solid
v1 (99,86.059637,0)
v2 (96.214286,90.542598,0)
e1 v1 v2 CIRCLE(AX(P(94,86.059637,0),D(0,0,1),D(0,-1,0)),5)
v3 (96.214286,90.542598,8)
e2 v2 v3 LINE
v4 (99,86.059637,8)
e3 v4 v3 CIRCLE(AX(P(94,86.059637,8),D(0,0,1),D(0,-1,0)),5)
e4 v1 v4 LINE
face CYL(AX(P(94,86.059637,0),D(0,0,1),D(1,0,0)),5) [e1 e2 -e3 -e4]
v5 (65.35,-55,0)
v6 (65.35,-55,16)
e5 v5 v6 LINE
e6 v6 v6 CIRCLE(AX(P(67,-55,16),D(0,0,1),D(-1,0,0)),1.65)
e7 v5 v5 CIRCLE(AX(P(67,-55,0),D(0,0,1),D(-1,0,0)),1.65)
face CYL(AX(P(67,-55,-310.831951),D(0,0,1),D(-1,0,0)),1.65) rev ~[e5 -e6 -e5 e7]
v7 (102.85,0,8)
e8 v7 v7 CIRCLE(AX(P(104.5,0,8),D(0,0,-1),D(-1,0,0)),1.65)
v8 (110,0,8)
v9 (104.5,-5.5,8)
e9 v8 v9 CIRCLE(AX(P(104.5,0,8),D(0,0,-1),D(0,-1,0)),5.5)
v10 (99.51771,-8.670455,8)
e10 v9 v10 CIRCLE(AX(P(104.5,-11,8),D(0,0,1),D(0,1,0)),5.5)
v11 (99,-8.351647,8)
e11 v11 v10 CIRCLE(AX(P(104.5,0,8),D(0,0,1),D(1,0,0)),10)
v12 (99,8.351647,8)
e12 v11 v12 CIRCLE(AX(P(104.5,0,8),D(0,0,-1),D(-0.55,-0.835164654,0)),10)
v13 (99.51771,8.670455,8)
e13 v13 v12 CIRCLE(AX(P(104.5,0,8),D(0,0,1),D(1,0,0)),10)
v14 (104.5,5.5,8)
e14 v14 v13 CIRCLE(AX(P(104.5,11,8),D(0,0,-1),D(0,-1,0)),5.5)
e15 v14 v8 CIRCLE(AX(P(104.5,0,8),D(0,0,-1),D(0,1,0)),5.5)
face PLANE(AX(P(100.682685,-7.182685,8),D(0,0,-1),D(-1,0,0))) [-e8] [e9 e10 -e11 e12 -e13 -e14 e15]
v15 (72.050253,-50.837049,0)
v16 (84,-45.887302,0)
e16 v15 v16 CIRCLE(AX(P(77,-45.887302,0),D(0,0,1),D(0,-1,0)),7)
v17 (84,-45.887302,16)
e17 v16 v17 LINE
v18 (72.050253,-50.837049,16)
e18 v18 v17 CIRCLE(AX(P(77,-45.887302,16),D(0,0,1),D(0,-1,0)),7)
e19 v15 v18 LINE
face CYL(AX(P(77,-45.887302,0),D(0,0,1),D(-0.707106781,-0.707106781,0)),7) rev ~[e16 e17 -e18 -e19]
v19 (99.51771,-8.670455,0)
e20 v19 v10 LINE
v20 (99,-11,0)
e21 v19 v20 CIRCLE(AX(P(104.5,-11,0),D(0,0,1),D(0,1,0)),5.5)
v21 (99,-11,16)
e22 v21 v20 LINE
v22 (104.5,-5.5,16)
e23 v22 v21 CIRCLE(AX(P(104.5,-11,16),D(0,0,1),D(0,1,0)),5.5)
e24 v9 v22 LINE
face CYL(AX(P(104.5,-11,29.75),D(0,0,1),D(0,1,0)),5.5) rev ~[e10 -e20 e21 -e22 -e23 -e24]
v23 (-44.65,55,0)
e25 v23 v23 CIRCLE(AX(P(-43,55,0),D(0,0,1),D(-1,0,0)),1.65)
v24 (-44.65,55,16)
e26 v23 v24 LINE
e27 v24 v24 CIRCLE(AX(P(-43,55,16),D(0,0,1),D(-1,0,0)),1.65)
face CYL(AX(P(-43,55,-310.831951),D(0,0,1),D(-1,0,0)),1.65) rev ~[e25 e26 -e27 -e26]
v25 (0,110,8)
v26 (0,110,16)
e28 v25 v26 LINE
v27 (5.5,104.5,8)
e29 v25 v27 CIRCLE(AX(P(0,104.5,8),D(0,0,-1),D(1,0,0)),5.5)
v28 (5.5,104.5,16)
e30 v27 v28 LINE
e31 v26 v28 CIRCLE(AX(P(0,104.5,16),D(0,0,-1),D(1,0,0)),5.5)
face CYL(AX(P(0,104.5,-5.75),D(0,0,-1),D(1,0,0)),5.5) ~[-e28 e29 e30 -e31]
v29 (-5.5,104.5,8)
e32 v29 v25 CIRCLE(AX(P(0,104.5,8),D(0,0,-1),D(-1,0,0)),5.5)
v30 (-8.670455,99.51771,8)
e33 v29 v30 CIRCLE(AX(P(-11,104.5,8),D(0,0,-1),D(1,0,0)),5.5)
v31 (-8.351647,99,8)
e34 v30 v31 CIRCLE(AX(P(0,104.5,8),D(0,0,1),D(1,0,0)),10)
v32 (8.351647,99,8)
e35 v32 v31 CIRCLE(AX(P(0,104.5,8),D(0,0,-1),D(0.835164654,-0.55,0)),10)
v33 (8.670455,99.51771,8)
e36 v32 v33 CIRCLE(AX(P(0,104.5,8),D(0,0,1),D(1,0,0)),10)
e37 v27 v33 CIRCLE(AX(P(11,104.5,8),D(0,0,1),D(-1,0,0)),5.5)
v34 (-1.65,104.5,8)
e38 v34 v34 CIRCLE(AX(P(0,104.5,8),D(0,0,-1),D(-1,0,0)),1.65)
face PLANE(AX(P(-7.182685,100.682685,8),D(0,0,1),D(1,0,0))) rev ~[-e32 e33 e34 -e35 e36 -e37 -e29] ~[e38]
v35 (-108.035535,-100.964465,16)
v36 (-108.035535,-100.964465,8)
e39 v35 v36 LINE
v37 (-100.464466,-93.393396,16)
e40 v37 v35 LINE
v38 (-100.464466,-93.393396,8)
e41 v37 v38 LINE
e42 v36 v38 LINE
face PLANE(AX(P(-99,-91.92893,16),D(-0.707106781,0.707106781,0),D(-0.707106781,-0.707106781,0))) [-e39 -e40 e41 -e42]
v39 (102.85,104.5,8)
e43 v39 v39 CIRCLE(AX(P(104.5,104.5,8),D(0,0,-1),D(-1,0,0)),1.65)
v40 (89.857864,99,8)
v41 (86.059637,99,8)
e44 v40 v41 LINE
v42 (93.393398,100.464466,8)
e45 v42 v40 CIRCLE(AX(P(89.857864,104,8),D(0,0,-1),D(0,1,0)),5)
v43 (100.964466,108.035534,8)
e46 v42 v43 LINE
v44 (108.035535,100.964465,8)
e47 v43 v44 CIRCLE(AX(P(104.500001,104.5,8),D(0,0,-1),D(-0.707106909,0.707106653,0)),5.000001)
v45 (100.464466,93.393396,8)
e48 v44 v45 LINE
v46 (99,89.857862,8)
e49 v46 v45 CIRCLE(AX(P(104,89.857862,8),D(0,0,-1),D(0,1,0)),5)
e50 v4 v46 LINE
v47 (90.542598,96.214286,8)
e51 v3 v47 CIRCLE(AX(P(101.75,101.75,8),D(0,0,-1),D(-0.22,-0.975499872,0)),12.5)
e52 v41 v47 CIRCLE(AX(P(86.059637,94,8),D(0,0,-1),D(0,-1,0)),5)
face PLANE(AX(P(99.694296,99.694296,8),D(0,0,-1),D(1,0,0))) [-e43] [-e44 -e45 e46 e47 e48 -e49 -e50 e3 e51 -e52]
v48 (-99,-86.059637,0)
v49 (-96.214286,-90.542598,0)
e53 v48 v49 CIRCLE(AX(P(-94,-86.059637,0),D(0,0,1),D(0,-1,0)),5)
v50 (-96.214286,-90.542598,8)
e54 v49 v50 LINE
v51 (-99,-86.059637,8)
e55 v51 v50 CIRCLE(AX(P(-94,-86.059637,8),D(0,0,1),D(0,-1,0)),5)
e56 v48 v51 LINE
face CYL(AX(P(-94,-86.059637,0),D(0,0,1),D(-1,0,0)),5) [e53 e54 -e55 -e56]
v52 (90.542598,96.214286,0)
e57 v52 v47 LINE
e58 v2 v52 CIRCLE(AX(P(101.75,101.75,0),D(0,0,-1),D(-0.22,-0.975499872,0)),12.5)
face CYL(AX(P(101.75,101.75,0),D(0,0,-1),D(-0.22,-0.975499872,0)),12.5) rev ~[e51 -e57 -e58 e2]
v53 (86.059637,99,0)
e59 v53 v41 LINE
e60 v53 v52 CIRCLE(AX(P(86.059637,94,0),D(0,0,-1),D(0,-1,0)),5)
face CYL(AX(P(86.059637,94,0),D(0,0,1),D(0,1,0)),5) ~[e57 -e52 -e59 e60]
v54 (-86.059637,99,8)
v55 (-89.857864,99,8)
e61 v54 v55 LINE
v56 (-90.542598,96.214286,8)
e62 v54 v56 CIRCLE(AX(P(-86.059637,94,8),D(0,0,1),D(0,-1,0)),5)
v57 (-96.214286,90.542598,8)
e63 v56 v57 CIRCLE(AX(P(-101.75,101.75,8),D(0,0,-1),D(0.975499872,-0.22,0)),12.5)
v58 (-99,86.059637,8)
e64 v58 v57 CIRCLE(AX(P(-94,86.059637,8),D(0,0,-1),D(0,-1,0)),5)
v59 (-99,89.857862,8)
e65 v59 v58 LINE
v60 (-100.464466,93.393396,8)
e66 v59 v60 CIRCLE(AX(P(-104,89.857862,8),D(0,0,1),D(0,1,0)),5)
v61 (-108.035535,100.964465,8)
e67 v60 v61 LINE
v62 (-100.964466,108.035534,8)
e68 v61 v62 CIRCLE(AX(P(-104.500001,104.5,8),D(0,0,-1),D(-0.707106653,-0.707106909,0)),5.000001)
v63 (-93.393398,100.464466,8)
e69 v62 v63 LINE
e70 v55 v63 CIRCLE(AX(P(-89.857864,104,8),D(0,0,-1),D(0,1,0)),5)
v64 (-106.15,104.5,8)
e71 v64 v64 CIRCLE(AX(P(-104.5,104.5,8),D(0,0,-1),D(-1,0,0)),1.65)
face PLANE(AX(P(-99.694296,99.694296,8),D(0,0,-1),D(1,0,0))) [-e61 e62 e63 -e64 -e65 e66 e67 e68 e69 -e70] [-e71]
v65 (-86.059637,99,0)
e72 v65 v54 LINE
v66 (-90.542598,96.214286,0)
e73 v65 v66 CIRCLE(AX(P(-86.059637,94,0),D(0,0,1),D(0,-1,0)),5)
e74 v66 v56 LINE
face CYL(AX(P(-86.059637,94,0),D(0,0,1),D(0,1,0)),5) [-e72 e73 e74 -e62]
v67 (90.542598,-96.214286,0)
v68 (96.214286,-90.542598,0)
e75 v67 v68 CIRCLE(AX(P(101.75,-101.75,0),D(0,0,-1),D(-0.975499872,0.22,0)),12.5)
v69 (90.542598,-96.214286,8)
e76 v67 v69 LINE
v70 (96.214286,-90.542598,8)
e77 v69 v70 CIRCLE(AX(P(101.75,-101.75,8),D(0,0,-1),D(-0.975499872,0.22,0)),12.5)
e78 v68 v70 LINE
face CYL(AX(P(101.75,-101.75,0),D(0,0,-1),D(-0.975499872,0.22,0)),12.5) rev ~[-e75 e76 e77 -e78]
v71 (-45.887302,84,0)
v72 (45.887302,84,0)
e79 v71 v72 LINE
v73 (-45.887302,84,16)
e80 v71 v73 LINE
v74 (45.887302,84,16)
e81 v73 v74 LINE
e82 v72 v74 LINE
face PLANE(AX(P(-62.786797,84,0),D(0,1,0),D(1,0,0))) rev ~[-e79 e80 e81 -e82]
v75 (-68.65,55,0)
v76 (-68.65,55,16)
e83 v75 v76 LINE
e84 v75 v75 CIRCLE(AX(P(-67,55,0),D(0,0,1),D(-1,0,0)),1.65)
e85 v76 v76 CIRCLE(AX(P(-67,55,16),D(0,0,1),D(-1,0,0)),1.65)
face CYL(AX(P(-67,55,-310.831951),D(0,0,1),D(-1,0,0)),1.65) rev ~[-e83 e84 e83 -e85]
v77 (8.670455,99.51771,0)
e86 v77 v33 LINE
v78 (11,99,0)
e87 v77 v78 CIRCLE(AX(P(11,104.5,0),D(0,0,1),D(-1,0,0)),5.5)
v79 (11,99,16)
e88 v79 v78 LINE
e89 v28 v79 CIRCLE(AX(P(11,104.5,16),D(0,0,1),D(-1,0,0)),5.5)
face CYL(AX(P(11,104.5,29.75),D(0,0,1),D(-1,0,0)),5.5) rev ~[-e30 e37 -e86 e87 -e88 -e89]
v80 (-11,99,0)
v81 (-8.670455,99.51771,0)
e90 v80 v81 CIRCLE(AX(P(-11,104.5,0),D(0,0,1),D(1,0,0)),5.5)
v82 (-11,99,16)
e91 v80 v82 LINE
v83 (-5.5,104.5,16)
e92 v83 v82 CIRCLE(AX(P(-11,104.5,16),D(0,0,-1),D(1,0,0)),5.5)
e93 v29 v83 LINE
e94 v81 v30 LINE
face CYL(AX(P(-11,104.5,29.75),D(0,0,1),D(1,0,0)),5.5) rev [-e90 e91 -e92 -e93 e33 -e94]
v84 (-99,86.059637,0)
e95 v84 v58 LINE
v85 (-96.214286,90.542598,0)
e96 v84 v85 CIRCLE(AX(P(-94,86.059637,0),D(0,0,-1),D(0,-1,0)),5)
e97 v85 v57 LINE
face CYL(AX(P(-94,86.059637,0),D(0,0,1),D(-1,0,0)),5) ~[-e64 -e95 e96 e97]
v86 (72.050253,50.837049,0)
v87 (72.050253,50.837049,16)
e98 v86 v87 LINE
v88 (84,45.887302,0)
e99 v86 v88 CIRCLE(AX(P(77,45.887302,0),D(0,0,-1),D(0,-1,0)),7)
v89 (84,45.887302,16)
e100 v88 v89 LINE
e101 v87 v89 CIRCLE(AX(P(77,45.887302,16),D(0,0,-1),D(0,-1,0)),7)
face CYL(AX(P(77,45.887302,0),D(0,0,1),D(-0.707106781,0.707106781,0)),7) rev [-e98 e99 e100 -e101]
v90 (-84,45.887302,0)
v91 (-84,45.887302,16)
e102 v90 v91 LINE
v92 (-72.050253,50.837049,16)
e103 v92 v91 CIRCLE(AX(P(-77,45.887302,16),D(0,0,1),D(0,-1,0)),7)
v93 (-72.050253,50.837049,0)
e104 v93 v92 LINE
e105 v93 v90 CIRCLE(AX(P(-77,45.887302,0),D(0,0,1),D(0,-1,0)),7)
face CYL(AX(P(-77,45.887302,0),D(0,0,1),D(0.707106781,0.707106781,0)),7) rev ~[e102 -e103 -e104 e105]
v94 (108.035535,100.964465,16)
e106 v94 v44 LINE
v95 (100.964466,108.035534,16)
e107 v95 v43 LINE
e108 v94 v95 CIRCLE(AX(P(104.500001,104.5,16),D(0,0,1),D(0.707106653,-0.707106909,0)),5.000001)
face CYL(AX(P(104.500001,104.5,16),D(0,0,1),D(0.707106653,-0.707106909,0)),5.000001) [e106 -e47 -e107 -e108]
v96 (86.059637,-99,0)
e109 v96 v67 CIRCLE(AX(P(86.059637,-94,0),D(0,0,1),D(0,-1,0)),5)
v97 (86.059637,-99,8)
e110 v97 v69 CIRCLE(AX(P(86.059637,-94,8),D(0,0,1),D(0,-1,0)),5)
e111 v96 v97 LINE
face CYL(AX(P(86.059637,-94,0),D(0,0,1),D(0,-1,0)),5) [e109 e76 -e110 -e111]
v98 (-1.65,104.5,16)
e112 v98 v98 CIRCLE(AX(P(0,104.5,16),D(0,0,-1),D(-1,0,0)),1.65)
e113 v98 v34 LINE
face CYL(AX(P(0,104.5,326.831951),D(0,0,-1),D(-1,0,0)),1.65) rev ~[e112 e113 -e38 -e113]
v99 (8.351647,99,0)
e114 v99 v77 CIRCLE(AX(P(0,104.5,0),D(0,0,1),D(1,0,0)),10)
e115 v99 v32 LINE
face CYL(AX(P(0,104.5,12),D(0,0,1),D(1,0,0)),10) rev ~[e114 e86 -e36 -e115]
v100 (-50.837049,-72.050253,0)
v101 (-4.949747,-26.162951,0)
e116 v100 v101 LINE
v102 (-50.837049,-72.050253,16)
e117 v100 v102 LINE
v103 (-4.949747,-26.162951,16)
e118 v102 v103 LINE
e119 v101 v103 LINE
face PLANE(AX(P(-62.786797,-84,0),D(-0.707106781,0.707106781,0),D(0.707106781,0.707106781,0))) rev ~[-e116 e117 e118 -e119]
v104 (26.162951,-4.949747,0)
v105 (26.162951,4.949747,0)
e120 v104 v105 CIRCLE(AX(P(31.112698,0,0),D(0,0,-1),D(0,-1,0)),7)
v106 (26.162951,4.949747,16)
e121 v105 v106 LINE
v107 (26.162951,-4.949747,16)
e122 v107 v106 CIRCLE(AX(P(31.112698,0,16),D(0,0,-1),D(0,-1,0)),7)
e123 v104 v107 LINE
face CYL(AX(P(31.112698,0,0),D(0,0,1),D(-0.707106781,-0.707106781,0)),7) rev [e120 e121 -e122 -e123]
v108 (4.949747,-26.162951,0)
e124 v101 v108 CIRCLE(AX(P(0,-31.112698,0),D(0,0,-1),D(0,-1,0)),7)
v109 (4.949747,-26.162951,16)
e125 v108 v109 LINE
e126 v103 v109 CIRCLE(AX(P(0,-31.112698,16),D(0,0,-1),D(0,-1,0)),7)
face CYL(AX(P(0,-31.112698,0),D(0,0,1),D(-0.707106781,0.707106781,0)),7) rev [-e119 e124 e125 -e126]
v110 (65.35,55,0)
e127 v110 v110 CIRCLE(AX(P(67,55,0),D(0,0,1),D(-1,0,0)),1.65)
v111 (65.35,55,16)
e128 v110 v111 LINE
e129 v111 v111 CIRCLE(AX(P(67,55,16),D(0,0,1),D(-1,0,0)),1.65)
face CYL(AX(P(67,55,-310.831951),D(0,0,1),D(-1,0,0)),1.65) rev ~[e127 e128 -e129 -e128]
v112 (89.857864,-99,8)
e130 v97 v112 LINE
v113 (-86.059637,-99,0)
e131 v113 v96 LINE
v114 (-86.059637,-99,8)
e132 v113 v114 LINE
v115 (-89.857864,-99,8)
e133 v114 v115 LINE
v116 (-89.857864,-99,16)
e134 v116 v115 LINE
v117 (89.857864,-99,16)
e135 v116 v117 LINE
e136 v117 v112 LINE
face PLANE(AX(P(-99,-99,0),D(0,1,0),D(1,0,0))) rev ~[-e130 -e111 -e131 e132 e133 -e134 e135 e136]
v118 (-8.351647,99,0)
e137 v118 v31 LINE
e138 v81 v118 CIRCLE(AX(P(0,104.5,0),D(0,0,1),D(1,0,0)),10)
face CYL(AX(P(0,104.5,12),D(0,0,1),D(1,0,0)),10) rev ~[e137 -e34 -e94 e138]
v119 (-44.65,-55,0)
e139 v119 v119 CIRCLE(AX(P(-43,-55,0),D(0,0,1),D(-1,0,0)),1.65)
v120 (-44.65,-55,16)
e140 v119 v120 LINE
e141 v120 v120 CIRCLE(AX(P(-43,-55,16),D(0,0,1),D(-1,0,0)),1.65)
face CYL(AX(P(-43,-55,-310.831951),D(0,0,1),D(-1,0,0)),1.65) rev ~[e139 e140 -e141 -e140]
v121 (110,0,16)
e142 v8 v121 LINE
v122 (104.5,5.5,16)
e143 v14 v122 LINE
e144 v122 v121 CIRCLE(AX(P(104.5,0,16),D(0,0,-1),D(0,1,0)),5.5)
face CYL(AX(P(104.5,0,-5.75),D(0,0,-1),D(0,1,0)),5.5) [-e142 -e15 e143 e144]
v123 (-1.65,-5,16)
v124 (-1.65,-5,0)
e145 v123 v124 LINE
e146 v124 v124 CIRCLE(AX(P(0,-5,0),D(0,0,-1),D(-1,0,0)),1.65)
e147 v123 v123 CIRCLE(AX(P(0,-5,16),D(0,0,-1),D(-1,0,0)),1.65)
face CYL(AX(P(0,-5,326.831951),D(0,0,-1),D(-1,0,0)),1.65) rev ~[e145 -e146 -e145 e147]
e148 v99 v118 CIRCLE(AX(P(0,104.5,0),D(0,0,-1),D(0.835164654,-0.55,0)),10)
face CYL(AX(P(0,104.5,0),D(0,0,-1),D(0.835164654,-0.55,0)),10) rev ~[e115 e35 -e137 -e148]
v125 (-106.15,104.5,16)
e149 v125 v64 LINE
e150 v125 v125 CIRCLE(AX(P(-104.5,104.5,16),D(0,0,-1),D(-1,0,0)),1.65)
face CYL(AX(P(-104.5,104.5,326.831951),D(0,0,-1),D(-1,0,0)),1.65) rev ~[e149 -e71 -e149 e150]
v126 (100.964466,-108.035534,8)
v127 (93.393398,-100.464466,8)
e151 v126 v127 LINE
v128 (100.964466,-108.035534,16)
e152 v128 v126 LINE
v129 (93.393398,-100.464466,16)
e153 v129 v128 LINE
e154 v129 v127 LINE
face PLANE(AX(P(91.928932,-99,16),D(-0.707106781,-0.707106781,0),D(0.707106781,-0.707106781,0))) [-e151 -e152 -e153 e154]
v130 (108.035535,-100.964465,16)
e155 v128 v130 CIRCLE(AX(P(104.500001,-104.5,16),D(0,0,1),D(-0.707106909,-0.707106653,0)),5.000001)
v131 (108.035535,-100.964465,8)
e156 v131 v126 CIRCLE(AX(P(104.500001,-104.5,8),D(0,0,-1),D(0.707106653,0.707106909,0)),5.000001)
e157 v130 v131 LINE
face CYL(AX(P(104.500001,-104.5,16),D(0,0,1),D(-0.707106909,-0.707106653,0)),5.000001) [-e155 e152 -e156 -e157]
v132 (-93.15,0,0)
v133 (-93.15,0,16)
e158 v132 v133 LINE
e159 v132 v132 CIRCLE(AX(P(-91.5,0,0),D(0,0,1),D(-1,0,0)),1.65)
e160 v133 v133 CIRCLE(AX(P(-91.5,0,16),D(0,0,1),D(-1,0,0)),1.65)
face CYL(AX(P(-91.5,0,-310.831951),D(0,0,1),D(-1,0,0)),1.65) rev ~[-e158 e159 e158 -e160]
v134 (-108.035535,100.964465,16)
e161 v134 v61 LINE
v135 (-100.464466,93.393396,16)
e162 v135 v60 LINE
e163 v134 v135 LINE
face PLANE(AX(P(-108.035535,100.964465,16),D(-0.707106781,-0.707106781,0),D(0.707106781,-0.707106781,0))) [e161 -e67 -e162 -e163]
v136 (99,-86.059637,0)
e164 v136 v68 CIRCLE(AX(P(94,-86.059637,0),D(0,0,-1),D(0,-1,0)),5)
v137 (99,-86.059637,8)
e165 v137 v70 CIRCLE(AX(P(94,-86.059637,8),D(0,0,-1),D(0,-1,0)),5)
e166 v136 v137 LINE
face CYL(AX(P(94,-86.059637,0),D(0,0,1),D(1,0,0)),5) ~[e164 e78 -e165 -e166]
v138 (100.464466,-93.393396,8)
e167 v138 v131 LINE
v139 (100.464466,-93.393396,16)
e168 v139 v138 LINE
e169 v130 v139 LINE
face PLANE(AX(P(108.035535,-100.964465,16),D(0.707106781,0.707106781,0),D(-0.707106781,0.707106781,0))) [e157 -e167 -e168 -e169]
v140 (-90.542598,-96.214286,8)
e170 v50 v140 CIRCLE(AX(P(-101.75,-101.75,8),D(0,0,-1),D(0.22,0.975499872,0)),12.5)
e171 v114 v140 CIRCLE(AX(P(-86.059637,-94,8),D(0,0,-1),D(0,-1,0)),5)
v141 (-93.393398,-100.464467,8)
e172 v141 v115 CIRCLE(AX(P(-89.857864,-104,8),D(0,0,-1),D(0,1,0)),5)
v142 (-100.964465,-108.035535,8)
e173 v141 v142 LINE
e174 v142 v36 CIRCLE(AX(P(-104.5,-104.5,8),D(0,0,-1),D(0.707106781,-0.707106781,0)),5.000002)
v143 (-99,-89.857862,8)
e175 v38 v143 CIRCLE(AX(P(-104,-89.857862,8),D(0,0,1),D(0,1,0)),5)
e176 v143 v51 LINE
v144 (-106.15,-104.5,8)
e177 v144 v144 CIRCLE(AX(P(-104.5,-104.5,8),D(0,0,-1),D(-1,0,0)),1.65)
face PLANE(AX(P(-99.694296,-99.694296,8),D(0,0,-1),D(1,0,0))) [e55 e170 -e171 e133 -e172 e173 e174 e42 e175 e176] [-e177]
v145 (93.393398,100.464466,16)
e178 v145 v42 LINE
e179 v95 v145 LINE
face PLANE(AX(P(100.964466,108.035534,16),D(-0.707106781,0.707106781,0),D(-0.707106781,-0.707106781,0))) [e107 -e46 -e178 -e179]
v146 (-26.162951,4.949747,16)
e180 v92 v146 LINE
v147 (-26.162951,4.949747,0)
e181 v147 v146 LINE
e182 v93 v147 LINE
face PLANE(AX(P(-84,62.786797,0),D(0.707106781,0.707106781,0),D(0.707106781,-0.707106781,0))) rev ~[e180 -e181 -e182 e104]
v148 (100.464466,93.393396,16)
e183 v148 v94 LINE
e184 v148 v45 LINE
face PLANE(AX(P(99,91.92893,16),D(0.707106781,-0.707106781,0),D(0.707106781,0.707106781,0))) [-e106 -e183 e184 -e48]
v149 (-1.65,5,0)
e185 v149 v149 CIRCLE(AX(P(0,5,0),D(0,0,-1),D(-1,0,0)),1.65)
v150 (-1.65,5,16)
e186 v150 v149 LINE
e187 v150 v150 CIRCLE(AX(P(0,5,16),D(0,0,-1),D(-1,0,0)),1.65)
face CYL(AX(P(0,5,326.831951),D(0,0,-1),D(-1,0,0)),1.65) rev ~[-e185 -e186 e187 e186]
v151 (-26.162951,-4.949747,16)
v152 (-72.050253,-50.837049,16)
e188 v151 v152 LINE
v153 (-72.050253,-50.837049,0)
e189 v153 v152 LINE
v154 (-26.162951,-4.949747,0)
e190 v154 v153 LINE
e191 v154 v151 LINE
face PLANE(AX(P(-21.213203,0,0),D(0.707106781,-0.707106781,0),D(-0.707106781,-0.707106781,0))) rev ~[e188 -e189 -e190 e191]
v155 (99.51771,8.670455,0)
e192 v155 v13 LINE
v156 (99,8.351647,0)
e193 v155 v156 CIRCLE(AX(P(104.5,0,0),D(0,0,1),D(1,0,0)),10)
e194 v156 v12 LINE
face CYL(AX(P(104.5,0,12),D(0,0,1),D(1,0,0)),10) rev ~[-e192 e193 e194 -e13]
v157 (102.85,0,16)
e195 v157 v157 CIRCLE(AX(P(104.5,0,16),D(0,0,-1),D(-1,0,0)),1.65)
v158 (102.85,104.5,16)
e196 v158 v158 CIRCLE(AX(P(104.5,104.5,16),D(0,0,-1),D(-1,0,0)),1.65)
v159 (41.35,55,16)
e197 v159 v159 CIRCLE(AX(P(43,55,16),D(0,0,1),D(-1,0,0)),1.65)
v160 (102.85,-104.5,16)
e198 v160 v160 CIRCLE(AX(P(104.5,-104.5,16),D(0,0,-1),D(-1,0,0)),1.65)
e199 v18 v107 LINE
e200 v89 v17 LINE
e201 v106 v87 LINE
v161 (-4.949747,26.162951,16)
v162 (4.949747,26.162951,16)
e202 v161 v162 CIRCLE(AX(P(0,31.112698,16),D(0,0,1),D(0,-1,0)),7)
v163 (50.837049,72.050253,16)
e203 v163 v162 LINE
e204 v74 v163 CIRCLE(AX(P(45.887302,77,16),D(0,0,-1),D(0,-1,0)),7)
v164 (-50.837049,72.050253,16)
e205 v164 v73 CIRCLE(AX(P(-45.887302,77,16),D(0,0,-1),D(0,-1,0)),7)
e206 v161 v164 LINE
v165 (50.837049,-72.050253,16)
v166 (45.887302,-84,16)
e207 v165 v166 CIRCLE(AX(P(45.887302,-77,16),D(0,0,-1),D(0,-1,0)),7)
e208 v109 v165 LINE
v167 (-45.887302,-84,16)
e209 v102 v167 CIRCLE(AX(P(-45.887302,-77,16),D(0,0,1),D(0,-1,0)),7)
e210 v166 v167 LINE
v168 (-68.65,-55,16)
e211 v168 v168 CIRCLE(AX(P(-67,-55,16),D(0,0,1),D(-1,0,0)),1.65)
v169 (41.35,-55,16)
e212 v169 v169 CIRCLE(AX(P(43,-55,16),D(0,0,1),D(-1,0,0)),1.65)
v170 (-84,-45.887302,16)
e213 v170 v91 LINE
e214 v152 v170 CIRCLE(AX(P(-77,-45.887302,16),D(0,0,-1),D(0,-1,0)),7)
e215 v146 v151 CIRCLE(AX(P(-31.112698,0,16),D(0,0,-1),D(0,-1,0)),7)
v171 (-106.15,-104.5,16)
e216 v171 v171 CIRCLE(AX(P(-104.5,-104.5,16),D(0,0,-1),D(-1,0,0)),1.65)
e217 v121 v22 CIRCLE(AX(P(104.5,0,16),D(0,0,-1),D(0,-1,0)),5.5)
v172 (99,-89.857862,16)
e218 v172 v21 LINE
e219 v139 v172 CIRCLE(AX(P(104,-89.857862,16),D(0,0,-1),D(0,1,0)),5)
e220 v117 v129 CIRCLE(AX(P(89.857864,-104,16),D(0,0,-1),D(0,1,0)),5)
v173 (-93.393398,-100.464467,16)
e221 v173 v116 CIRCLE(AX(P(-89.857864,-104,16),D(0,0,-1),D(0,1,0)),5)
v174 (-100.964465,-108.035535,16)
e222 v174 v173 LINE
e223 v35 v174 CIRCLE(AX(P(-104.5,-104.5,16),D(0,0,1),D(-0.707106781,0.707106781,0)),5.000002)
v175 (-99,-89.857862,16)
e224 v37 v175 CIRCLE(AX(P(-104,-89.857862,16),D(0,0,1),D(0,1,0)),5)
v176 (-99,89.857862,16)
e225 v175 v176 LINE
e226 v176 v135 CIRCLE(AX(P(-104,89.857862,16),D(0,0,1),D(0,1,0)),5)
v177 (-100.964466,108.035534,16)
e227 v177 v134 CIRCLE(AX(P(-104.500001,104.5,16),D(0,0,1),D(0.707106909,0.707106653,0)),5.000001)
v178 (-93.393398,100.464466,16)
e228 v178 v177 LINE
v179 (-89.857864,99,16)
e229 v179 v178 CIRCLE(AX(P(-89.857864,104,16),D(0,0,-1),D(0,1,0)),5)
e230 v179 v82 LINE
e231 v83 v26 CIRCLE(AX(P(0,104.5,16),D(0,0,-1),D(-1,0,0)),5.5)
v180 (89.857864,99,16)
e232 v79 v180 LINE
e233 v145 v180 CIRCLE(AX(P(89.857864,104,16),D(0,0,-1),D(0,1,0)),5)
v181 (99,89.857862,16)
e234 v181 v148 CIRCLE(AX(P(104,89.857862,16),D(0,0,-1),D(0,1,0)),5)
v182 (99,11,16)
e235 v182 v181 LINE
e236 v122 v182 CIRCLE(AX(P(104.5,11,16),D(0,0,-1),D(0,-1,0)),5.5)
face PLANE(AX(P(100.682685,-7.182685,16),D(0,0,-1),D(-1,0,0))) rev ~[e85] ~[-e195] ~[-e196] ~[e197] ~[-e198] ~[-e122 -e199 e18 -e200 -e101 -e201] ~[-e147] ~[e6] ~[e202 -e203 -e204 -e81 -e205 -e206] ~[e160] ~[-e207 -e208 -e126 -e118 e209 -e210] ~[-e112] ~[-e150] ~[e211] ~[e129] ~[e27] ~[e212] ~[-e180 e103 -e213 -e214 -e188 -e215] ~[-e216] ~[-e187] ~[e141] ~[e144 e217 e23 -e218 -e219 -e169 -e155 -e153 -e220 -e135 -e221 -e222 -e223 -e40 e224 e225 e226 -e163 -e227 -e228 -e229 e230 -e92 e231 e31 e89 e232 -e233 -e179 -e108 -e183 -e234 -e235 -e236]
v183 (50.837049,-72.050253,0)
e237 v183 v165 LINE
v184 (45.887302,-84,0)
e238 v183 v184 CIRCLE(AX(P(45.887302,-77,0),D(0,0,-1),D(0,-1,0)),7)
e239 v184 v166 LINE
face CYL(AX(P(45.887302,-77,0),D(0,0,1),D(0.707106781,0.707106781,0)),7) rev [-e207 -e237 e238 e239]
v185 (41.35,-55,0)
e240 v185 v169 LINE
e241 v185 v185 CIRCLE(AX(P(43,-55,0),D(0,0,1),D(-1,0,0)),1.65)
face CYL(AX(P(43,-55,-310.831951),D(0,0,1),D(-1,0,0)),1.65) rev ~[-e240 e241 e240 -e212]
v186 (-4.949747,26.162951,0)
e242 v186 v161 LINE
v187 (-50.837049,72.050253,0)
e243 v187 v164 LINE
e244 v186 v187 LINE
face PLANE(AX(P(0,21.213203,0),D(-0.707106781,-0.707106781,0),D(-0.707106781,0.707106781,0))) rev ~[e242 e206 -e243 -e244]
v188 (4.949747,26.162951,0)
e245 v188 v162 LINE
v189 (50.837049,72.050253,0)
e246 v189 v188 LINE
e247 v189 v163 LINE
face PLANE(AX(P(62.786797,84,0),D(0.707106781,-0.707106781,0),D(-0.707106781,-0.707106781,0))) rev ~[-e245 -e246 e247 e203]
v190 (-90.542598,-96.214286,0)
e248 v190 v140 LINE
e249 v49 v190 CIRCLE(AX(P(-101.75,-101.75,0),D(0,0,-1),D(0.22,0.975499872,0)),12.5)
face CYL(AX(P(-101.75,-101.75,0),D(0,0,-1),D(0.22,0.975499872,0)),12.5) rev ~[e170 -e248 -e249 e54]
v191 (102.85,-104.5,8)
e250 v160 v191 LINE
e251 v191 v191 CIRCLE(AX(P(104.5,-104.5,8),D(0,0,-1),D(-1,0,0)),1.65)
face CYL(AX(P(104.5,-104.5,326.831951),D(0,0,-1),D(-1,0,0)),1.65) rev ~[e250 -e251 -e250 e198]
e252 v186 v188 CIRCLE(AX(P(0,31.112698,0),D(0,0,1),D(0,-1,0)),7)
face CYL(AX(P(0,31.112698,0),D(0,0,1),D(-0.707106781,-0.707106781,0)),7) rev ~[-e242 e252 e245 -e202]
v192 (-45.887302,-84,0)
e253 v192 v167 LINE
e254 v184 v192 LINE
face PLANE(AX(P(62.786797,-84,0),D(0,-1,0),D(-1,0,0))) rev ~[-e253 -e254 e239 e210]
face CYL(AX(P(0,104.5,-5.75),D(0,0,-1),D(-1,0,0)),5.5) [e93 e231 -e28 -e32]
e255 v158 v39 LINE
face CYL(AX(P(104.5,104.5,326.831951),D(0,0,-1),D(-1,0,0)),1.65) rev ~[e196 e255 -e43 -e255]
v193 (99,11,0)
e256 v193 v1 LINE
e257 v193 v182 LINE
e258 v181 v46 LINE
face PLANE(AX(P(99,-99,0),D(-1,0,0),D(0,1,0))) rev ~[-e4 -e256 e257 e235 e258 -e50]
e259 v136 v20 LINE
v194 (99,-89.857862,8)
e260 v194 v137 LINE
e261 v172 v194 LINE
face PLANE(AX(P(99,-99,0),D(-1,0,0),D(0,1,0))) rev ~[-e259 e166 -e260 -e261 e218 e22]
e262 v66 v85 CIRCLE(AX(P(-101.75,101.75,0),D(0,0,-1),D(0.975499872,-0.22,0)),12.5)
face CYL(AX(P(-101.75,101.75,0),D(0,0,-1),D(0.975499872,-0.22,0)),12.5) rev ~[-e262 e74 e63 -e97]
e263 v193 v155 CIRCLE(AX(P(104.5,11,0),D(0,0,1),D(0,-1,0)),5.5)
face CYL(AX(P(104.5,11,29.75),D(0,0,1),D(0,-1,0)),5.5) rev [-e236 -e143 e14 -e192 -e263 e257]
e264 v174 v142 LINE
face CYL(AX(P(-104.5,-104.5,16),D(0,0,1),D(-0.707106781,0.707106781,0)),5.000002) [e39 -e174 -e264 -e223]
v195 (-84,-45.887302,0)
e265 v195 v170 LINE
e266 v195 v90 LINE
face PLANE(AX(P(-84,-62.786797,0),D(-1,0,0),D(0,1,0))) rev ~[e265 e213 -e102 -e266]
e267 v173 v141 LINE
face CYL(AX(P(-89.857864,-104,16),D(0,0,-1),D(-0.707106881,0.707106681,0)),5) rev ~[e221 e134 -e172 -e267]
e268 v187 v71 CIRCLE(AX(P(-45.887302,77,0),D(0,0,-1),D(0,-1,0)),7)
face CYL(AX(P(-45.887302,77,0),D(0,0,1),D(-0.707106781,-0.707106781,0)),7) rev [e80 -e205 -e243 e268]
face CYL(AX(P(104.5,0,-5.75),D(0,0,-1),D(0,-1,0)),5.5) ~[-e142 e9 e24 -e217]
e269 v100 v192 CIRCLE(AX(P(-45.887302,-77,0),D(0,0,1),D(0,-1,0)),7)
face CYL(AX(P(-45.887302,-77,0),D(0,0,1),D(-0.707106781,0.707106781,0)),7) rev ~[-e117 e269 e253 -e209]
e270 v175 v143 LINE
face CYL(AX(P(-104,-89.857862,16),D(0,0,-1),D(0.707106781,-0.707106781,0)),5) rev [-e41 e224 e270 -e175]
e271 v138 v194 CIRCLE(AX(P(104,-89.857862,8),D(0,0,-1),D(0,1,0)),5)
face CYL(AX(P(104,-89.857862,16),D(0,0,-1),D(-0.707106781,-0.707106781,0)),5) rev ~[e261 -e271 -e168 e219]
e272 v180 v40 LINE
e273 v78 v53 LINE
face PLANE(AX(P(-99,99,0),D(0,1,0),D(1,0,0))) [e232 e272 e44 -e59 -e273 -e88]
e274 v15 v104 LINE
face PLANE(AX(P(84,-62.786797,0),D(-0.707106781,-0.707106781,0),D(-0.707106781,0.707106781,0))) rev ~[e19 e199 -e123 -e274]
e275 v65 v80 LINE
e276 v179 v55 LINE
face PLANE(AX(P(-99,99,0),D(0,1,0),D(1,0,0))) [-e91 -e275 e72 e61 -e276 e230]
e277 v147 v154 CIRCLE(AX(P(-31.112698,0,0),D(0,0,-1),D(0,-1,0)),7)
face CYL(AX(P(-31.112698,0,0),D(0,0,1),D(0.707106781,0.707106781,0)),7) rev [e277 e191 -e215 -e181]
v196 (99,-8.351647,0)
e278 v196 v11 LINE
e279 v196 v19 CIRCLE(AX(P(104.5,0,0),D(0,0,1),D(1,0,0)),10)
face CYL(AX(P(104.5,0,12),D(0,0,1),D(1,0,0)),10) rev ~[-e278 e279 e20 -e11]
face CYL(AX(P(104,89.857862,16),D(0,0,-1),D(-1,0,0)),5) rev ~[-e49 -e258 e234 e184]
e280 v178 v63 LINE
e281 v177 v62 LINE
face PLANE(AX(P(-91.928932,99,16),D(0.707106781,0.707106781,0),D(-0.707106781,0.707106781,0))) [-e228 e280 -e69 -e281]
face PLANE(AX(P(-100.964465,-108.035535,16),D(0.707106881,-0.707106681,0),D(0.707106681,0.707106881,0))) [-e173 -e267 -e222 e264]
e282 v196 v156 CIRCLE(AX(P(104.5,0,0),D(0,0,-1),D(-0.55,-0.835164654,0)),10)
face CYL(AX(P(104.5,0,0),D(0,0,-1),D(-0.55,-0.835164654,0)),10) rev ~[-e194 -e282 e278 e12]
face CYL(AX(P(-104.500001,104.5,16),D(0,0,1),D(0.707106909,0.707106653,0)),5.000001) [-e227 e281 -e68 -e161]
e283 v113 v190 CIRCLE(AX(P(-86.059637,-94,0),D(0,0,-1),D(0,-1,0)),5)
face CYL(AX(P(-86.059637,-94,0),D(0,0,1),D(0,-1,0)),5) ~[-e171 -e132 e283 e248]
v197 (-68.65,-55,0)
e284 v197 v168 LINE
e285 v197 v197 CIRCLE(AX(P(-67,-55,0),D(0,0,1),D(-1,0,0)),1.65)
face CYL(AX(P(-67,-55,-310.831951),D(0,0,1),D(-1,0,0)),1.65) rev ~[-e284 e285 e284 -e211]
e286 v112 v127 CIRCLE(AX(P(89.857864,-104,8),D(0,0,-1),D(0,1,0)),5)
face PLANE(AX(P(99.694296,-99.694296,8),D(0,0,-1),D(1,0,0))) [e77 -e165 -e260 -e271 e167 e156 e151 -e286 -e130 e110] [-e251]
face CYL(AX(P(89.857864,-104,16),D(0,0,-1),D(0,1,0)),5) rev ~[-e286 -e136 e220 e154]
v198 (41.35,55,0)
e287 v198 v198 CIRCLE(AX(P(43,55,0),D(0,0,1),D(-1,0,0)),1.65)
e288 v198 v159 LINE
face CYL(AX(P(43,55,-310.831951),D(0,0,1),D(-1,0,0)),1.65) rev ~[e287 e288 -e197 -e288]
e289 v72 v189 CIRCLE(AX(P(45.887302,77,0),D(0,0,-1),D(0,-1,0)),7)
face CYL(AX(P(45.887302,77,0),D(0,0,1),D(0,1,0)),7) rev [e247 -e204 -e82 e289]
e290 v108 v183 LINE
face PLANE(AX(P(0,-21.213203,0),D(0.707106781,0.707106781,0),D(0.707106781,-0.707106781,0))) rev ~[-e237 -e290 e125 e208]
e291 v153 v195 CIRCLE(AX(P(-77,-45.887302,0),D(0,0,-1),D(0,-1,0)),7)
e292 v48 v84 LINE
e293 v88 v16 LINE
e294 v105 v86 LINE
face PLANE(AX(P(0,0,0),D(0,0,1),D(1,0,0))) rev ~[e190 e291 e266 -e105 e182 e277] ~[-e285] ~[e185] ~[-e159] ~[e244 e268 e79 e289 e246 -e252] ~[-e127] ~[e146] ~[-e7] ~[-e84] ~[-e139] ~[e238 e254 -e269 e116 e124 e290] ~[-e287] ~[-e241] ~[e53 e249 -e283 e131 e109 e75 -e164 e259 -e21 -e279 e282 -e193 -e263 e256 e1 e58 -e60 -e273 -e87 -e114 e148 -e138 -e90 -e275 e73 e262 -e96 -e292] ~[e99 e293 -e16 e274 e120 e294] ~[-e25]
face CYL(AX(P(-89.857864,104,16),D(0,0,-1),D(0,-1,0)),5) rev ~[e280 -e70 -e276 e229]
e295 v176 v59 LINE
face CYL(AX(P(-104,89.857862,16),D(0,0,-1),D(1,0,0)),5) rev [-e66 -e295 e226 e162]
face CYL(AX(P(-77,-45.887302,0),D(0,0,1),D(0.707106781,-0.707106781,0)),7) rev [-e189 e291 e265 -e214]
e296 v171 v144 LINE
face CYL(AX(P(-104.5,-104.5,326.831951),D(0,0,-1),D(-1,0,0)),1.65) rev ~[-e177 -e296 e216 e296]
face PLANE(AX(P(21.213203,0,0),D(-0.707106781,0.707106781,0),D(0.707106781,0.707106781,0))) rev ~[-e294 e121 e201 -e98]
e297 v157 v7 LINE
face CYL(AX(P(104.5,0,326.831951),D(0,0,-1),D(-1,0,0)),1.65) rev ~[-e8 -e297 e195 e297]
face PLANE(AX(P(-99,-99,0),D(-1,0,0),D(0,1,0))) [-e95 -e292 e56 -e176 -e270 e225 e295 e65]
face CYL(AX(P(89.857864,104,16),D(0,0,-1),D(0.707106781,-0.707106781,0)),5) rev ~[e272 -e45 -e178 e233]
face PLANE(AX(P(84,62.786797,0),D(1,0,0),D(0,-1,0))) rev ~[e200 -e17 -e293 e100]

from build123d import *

# Parameters (mm, degrees)
F0_W         = 198
F0_H         = 198
F1_DEPTH     = 16
F2_W         = 11
F2_H         = 11
F3_DEPTH     = 16
F5_DEPTH     = 8
F6_R         = 5
F7_R         = 7
F8_T1_DEPTH  = 35.5
F8_T3_DEPTH  = 8
F8_T8_DEPTH  = 35.5
F8_S11_R     = 10
F8_T12_DEPTH = 20
F8_T16_DEPTH = 35.5
F8_S19_R     = 10
F8_T20_DEPTH = 20
F8_T24_DEPTH = 35.5
F8_S27_R     = 10
F8_T28_DEPTH = 20
F8_T32_DEPTH = 35.5
F8_S35_R     = 10
F8_T36_DEPTH = 20
F9_D         = 3.3
F10_D        = 3.3
F11_D        = 3.3


# Not quite as in the source:
# - a fillet or chamfer that OpenCascade refuses, or shapes differently, is made with other operations: its cross-section is extruded or revolved along the edge and cut away or added
# - ends of sketch curves that miss each other by under 0.0002 mm in the source are joined


with BuildPart() as f1:
    # F0 (on Top) → F1 (new body)
    with BuildSketch(Plane.XY):
        Rectangle(F0_W, F0_H)
        Polygon((-62.7867965644, -84), (0, -21.2132034356), (62.7867965644, -84), align=None, mode=Mode.SUBTRACT)
        Polygon((84, -62.7867965644), (21.2132034356, 0), (84, 62.7867965644), align=None, mode=Mode.SUBTRACT)
        Polygon((-84, 62.7867965644), (-21.2132034356, 0), (-84, -62.7867965644), align=None, mode=Mode.SUBTRACT)
        Polygon((62.7867965644, 84), (0, 21.2132034356), (-62.7867965644, 84), align=None, mode=Mode.SUBTRACT)
    extrude(amount=F1_DEPTH)

    # F2 (on face) → F3 (join, through all)
    with BuildSketch(Plane.XY.offset(16)):
        with BuildLine():
            Line((-99, -99), (-99, -91.9289296269))
            Line((-99, -91.9289296269), (-108.0355351865, -100.9644648135))
            ThreePointArc((-108.0355351865, -100.9644648135), (-108.0355351865, -108.0355351865), (-100.9644648135, -108.0355351865))
            Line((-100.9644648135, -108.0355351865), (-91.9289321881, -99))
            Line((-91.9289321881, -99), (-99, -99))
        make_face()
        with BuildLine():
            Line((99, -99), (91.9289321881, -99))
            Line((91.9289321881, -99), (100.9644660941, -108.0355339059))
            ThreePointArc((100.9644660941, -108.0355339059), (108.0355351865, -108.0355351865), (108.0355351865, -100.9644648135))
            Line((108.0355351865, -100.9644648135), (99, -91.9289296269))
            Line((99, -91.9289296269), (99, -99))
        make_face()
        with Locations((104.5, 0)):
            Rectangle(F2_W, F2_H)
        with BuildLine():
            Line((100.9644660941, 108.0355339059), (91.9289321881, 99))
            Line((91.9289321881, 99), (99, 99))
            Line((99, 99), (99, 91.9289296269))
            Line((99, 91.9289296269), (108.0355351865, 100.9644648135))
            ThreePointArc((108.0355351865, 100.9644648135), (108.0355351865, 108.0355351865), (100.9644660941, 108.0355339059))
        make_face()
        with BuildLine():
            Line((-99, 99), (-91.9289321881, 99))
            Line((-91.9289321881, 99), (-100.9644660941, 108.0355339059))
            ThreePointArc((-100.9644660941, 108.0355339059), (-108.0355351865, 108.0355351865), (-108.0355351865, 100.9644648135))
            Line((-108.0355351865, 100.9644648135), (-99, 91.9289296269))
            Line((-99, 91.9289296269), (-99, 99))
        make_face()
        with Locations((0, 104.5)):
            Rectangle(F2_W, F2_H)
    extrude(amount=-F3_DEPTH)

    # F4 (on face) → F5 (cut)
    with BuildSketch(Plane(origin=(0, 0, 0), x_dir=(1, 0, 0), z_dir=(0, 0, -1))):
        with BuildLine():
            Line((-99, 91.9289296269), (-99, 89.5562516017))
            ThreePointArc((-99, 89.5562516017), (-92.9111652352, 92.9111652352), (-89.5562516017, 99))
            Line((-89.5562516017, 99), (-91.9289321881, 99))
            Line((-91.9289321881, 99), (-100.9644648135, 108.0355351865))
            ThreePointArc((-100.9644648135, 108.0355351865), (-108.0355351865, 108.0355351865), (-108.0355351865, 100.9644648135))
            Line((-108.0355351865, 100.9644648135), (-99, 91.9289296269))
        make_face()
        with BuildLine():
            Line((91.9289321881, 99), (89.5562516017, 99))
            ThreePointArc((89.5562516017, 99), (92.9111652352, 92.9111652352), (99, 89.5562516017))
            Line((99, 89.5562516017), (99, 91.9289296269))
            Line((99, 91.9289296269), (108.0355351865, 100.9644648135))
            ThreePointArc((108.0355351865, 100.9644648135), (108.0355358268, 108.0355345462), (100.9644660941, 108.0355339059))
            Line((100.9644660941, 108.0355339059), (91.9289321881, 99))
        make_face()
        with BuildLine():
            ThreePointArc((-89.5562516017, -99), (-92.9111652352, -92.9111652352), (-99, -89.5562516017))
            Line((-99, -89.5562516017), (-99, -91.9289296269))
            Line((-99, -91.9289296269), (-108.0355351865, -100.9644648135))
            ThreePointArc((-108.0355351865, -100.9644648135), (-108.0355358268, -108.0355345462), (-100.9644660941, -108.0355339059))
            Line((-100.9644660941, -108.0355339059), (-91.9289321881, -99))
            Line((-91.9289321881, -99), (-89.5562516017, -99))
        make_face()
        with BuildLine():
            Line((99, 5.5), (99, 8.3516465442))
            ThreePointArc((99, 8.3516465442), (94.5, 0), (99, -8.3516465442))
            Line((99, -8.3516465442), (99, -5.5))
            Line((99, -5.5), (110, -5.5))
            Line((110, -5.5), (110, 5.5))
            Line((110, 5.5), (99, 5.5))
        make_face()
        with BuildLine():
            ThreePointArc((114.5, 0), (109.2434164903, 8.8034084308), (99, 8.3516465442))
            Line((99, 8.3516465442), (99, 5.5))
            Line((99, 5.5), (110, 5.5))
            Line((110, 5.5), (110, -5.5))
            Line((110, -5.5), (99, -5.5))
            Line((99, -5.5), (99, -8.3516465442))
            ThreePointArc((99, -8.3516465442), (109.2434164903, -8.8034084308), (114.5, 0))
        make_face()
        with BuildLine():
            Line((-5.5, -99), (-8.3516465442, -99))
            ThreePointArc((-8.3516465442, -99), (-2.8708478327, -114.0790517652), (10, -104.5))
            ThreePointArc((10, -104.5), (9.5790517652, -101.6291521673), (8.3516465442, -99))
            Line((8.3516465442, -99), (5.5, -99))
            Line((5.5, -99), (5.5, -110))
            Line((5.5, -110), (-5.5, -110))
            Line((-5.5, -110), (-5.5, -99))
        make_face()
        with BuildLine():
            ThreePointArc((8.3516465442, -99), (0, -94.5), (-8.3516465442, -99))
            Line((-8.3516465442, -99), (-5.5, -99))
            Line((-5.5, -99), (-5.5, -110))
            Line((-5.5, -110), (5.5, -110))
            Line((5.5, -110), (5.5, -99))
            Line((5.5, -99), (8.3516465442, -99))
        make_face()
        with BuildLine():
            Line((99, -91.9289296269), (99, -89.5562516017))
            ThreePointArc((99, -89.5562516017), (92.9111652352, -92.9111652352), (89.5562516017, -99))
            Line((89.5562516017, -99), (91.9289321881, -99))
            Line((91.9289321881, -99), (100.9644660941, -108.0355339059))
            ThreePointArc((100.9644660941, -108.0355339059), (108.0355358268, -108.0355345462), (108.0355351865, -100.9644648135))
            Line((108.0355351865, -100.9644648135), (99, -91.9289296269))
        make_face()
    extrude(amount=-F5_DEPTH, mode=Mode.SUBTRACT)

    # F6
    f6_edges = [f1.edges().sort_by_distance(p)[0] for p in [
        (-91.928932, 99, 12),
        (-99, 91.92893, 12),
        (-99, -91.92893, 12),
        (-91.928932, -99, 12),
        (91.928932, -99, 12),
        (99, -91.92893, 12),
        (99, 91.92893, 12),
        (91.928932, 99, 12),
        (89.556252, 99, 4),
        (99, 89.556252, 4),
        (99, -89.556252, 4),
        (89.556252, -99, 4),
        (-89.556252, -99, 4),
        (-99, -89.556252, 4),
        (-89.556252, 99, 4),
        (-99, 89.556252, 4),
    ]]
    fillet(f6_edges, radius=F6_R)

    # F7
    f7_edges = [f1.edges().sort_by_distance(p)[0] for p in [
        (-84, -62.786797, 8),
        (-84, 62.786797, 8),
        (-21.213203, 0, 8),
        (62.786797, -84, 8),
        (-62.786797, -84, 8),
        (0, -21.213203, 8),
        (21.213203, 0, 8),
        (84, -62.786797, 8),
        (84, 62.786797, 8),
        (62.786797, 84, 8),
        (0, 21.213203, 8),
        (-62.786797, 84, 8),
    ]]
    fillet(f7_edges, radius=F7_R)

    # F8: fillet of radius 5.5 on 8 edges, made by hand

    # F8_s2 → F8_t1 (cut)
    with BuildSketch(Plane.XY.offset(-5.75)):
        with BuildLine():
            ThreePointArc((104.5, -5.5), (108.3890872965, -3.8890872965), (110, 0))
            Line((110, 0), (110, -5.5))
            Line((110, -5.5), (104.5, -5.5))
        make_face()
        with BuildLine():
            ThreePointArc((104.5, 5.5), (108.3890872965, 3.8890872965), (110, 0))
            Line((110, 0), (110, 5.5))
            Line((110, 5.5), (104.5, 5.5))
        make_face()
        with BuildLine():
            ThreePointArc((-5.5, 104.5), (-3.8890872965, 108.3890872965), (0, 110))
            Line((0, 110), (-5.5, 110))
            Line((-5.5, 110), (-5.5, 104.5))
        make_face()
        with BuildLine():
            ThreePointArc((5.5, 104.5), (3.8890872965, 108.3890872965), (0, 110))
            Line((0, 110), (5.5, 110))
            Line((5.5, 110), (5.5, 104.5))
        make_face()
    extrude(amount=F8_T1_DEPTH, mode=Mode.SUBTRACT)

    # F8_s4 → F8_t3 (join)
    with BuildSketch(Plane.XY.offset(8)):
        with BuildLine():
            ThreePointArc((104.5, -5.5), (100.6109127035, -7.1109127035), (99, -11))
            Line((99, -11), (99, -5.5))
            Line((99, -5.5), (104.5, -5.5))
        make_face()
        with BuildLine():
            ThreePointArc((104.5, 5.5), (100.6109127035, 7.1109127035), (99, 11))
            Line((99, 11), (99, 5.5))
            Line((99, 5.5), (104.5, 5.5))
        make_face()
        with BuildLine():
            ThreePointArc((-5.5, 104.5), (-7.1109127035, 100.6109127035), (-11, 99))
            Line((-11, 99), (-5.5, 99))
            Line((-5.5, 99), (-5.5, 104.5))
        make_face()
        with BuildLine():
            ThreePointArc((5.5, 104.5), (7.1109127035, 100.6109127035), (11, 99))
            Line((11, 99), (5.5, 99))
            Line((5.5, 99), (5.5, 104.5))
        make_face()
    extrude(amount=F8_T3_DEPTH)


with BuildPart() as f8_tool6:
    # F8_s7 → F8_t8 (new body)
    with BuildSketch(Plane.XY.offset(29.75)):
        with BuildLine():
            ThreePointArc((104.5, -5.5), (100.6109127035, -7.1109127035), (99, -11))
            Line((99, -11), (99, -5.5))
            Line((99, -5.5), (104.5, -5.5))
        make_face()
    extrude(amount=-F8_T8_DEPTH)

    split(bisect_by=Plane.XY, keep=Keep.TOP)

    split(bisect_by=Plane.XY.offset(8), keep=Keep.BOTTOM)

    # F8_s11 → F8_t12 (cut, symmetric)
    with BuildSketch(Plane.XY.offset(12)):
        with Locations((104.5, 0)):
            Circle(F8_S11_R)
    extrude(amount=F8_T12_DEPTH, both=True, mode=Mode.SUBTRACT)


with BuildPart() as f1_1:
    add(f1.part)

    # F8_t5: union F8_tool6
    add(f8_tool6.part)


with BuildPart() as f8_tool14:
    # F8_s15 → F8_t16 (new body)
    with BuildSketch(Plane.XY.offset(29.75)):
        with BuildLine():
            ThreePointArc((104.5, 5.5), (100.6109127035, 7.1109127035), (99, 11))
            Line((99, 11), (99, 5.5))
            Line((99, 5.5), (104.5, 5.5))
        make_face()
    extrude(amount=-F8_T16_DEPTH)

    split(bisect_by=Plane.XY, keep=Keep.TOP)

    split(bisect_by=Plane.XY.offset(8), keep=Keep.BOTTOM)

    # F8_s19 → F8_t20 (cut, symmetric)
    with BuildSketch(Plane.XY.offset(12)):
        with Locations((104.5, 0)):
            Circle(F8_S19_R)
    extrude(amount=F8_T20_DEPTH, both=True, mode=Mode.SUBTRACT)


with BuildPart() as f1_2:
    add(f1_1.part)

    # F8_t13: union F8_tool14
    add(f8_tool14.part)


with BuildPart() as f8_tool22:
    # F8_s23 → F8_t24 (new body)
    with BuildSketch(Plane.XY.offset(29.75)):
        with BuildLine():
            ThreePointArc((-5.5, 104.5), (-7.1109127035, 100.6109127035), (-11, 99))
            Line((-11, 99), (-5.5, 99))
            Line((-5.5, 99), (-5.5, 104.5))
        make_face()
    extrude(amount=-F8_T24_DEPTH)

    split(bisect_by=Plane.XY, keep=Keep.TOP)

    split(bisect_by=Plane.XY.offset(8), keep=Keep.BOTTOM)

    # F8_s27 → F8_t28 (cut, symmetric)
    with BuildSketch(Plane.XY.offset(12)):
        with Locations((0, 104.5)):
            Circle(F8_S27_R)
    extrude(amount=F8_T28_DEPTH, both=True, mode=Mode.SUBTRACT)


with BuildPart() as f1_3:
    add(f1_2.part)

    # F8_t21: union F8_tool22
    add(f8_tool22.part)


with BuildPart() as f8_tool30:
    # F8_s31 → F8_t32 (new body)
    with BuildSketch(Plane.XY.offset(29.75)):
        with BuildLine():
            ThreePointArc((5.5, 104.5), (7.1109127035, 100.6109127035), (11, 99))
            Line((11, 99), (5.5, 99))
            Line((5.5, 99), (5.5, 104.5))
        make_face()
    extrude(amount=-F8_T32_DEPTH)

    split(bisect_by=Plane.XY, keep=Keep.TOP)

    split(bisect_by=Plane.XY.offset(8), keep=Keep.BOTTOM)

    # F8_s35 → F8_t36 (cut, symmetric)
    with BuildSketch(Plane.XY.offset(12)):
        with Locations((0, 104.5)):
            Circle(F8_S35_R)
    extrude(amount=F8_T36_DEPTH, both=True, mode=Mode.SUBTRACT)


with BuildPart() as f1_4:
    add(f1_3.part)

    # F8_t29: union F8_tool30
    add(f8_tool30.part)

    # F9 (through all)
    with Locations(Plane.XY.offset(16)):
        with Locations((104.5, 104.5), (-104.5, 104.5), (-104.5, -104.5), (104.5, -104.5), (0, -5), (0, 5), (0, 104.5), (104.5, 0)):
            Hole(F9_D / 2)

    # F10 (through all)
    with Locations(Plane(origin=(0, 0, 0), x_dir=(1, 0, 0), z_dir=(0, 0, -1))):
        with Locations((67, 55), (43, 55), (-43, 55), (-67, 55), (-67, -55), (-43, -55), (43, -55), (67, -55)):
            Hole(F10_D / 2)

    # F11 (through all)
    with Locations(Plane(origin=(0, 0, 0), x_dir=(1, 0, 0), z_dir=(0, 0, -1))):
        with Locations((-91.5, 0)):
            Hole(F11_D / 2)


solid = f1_4.part
